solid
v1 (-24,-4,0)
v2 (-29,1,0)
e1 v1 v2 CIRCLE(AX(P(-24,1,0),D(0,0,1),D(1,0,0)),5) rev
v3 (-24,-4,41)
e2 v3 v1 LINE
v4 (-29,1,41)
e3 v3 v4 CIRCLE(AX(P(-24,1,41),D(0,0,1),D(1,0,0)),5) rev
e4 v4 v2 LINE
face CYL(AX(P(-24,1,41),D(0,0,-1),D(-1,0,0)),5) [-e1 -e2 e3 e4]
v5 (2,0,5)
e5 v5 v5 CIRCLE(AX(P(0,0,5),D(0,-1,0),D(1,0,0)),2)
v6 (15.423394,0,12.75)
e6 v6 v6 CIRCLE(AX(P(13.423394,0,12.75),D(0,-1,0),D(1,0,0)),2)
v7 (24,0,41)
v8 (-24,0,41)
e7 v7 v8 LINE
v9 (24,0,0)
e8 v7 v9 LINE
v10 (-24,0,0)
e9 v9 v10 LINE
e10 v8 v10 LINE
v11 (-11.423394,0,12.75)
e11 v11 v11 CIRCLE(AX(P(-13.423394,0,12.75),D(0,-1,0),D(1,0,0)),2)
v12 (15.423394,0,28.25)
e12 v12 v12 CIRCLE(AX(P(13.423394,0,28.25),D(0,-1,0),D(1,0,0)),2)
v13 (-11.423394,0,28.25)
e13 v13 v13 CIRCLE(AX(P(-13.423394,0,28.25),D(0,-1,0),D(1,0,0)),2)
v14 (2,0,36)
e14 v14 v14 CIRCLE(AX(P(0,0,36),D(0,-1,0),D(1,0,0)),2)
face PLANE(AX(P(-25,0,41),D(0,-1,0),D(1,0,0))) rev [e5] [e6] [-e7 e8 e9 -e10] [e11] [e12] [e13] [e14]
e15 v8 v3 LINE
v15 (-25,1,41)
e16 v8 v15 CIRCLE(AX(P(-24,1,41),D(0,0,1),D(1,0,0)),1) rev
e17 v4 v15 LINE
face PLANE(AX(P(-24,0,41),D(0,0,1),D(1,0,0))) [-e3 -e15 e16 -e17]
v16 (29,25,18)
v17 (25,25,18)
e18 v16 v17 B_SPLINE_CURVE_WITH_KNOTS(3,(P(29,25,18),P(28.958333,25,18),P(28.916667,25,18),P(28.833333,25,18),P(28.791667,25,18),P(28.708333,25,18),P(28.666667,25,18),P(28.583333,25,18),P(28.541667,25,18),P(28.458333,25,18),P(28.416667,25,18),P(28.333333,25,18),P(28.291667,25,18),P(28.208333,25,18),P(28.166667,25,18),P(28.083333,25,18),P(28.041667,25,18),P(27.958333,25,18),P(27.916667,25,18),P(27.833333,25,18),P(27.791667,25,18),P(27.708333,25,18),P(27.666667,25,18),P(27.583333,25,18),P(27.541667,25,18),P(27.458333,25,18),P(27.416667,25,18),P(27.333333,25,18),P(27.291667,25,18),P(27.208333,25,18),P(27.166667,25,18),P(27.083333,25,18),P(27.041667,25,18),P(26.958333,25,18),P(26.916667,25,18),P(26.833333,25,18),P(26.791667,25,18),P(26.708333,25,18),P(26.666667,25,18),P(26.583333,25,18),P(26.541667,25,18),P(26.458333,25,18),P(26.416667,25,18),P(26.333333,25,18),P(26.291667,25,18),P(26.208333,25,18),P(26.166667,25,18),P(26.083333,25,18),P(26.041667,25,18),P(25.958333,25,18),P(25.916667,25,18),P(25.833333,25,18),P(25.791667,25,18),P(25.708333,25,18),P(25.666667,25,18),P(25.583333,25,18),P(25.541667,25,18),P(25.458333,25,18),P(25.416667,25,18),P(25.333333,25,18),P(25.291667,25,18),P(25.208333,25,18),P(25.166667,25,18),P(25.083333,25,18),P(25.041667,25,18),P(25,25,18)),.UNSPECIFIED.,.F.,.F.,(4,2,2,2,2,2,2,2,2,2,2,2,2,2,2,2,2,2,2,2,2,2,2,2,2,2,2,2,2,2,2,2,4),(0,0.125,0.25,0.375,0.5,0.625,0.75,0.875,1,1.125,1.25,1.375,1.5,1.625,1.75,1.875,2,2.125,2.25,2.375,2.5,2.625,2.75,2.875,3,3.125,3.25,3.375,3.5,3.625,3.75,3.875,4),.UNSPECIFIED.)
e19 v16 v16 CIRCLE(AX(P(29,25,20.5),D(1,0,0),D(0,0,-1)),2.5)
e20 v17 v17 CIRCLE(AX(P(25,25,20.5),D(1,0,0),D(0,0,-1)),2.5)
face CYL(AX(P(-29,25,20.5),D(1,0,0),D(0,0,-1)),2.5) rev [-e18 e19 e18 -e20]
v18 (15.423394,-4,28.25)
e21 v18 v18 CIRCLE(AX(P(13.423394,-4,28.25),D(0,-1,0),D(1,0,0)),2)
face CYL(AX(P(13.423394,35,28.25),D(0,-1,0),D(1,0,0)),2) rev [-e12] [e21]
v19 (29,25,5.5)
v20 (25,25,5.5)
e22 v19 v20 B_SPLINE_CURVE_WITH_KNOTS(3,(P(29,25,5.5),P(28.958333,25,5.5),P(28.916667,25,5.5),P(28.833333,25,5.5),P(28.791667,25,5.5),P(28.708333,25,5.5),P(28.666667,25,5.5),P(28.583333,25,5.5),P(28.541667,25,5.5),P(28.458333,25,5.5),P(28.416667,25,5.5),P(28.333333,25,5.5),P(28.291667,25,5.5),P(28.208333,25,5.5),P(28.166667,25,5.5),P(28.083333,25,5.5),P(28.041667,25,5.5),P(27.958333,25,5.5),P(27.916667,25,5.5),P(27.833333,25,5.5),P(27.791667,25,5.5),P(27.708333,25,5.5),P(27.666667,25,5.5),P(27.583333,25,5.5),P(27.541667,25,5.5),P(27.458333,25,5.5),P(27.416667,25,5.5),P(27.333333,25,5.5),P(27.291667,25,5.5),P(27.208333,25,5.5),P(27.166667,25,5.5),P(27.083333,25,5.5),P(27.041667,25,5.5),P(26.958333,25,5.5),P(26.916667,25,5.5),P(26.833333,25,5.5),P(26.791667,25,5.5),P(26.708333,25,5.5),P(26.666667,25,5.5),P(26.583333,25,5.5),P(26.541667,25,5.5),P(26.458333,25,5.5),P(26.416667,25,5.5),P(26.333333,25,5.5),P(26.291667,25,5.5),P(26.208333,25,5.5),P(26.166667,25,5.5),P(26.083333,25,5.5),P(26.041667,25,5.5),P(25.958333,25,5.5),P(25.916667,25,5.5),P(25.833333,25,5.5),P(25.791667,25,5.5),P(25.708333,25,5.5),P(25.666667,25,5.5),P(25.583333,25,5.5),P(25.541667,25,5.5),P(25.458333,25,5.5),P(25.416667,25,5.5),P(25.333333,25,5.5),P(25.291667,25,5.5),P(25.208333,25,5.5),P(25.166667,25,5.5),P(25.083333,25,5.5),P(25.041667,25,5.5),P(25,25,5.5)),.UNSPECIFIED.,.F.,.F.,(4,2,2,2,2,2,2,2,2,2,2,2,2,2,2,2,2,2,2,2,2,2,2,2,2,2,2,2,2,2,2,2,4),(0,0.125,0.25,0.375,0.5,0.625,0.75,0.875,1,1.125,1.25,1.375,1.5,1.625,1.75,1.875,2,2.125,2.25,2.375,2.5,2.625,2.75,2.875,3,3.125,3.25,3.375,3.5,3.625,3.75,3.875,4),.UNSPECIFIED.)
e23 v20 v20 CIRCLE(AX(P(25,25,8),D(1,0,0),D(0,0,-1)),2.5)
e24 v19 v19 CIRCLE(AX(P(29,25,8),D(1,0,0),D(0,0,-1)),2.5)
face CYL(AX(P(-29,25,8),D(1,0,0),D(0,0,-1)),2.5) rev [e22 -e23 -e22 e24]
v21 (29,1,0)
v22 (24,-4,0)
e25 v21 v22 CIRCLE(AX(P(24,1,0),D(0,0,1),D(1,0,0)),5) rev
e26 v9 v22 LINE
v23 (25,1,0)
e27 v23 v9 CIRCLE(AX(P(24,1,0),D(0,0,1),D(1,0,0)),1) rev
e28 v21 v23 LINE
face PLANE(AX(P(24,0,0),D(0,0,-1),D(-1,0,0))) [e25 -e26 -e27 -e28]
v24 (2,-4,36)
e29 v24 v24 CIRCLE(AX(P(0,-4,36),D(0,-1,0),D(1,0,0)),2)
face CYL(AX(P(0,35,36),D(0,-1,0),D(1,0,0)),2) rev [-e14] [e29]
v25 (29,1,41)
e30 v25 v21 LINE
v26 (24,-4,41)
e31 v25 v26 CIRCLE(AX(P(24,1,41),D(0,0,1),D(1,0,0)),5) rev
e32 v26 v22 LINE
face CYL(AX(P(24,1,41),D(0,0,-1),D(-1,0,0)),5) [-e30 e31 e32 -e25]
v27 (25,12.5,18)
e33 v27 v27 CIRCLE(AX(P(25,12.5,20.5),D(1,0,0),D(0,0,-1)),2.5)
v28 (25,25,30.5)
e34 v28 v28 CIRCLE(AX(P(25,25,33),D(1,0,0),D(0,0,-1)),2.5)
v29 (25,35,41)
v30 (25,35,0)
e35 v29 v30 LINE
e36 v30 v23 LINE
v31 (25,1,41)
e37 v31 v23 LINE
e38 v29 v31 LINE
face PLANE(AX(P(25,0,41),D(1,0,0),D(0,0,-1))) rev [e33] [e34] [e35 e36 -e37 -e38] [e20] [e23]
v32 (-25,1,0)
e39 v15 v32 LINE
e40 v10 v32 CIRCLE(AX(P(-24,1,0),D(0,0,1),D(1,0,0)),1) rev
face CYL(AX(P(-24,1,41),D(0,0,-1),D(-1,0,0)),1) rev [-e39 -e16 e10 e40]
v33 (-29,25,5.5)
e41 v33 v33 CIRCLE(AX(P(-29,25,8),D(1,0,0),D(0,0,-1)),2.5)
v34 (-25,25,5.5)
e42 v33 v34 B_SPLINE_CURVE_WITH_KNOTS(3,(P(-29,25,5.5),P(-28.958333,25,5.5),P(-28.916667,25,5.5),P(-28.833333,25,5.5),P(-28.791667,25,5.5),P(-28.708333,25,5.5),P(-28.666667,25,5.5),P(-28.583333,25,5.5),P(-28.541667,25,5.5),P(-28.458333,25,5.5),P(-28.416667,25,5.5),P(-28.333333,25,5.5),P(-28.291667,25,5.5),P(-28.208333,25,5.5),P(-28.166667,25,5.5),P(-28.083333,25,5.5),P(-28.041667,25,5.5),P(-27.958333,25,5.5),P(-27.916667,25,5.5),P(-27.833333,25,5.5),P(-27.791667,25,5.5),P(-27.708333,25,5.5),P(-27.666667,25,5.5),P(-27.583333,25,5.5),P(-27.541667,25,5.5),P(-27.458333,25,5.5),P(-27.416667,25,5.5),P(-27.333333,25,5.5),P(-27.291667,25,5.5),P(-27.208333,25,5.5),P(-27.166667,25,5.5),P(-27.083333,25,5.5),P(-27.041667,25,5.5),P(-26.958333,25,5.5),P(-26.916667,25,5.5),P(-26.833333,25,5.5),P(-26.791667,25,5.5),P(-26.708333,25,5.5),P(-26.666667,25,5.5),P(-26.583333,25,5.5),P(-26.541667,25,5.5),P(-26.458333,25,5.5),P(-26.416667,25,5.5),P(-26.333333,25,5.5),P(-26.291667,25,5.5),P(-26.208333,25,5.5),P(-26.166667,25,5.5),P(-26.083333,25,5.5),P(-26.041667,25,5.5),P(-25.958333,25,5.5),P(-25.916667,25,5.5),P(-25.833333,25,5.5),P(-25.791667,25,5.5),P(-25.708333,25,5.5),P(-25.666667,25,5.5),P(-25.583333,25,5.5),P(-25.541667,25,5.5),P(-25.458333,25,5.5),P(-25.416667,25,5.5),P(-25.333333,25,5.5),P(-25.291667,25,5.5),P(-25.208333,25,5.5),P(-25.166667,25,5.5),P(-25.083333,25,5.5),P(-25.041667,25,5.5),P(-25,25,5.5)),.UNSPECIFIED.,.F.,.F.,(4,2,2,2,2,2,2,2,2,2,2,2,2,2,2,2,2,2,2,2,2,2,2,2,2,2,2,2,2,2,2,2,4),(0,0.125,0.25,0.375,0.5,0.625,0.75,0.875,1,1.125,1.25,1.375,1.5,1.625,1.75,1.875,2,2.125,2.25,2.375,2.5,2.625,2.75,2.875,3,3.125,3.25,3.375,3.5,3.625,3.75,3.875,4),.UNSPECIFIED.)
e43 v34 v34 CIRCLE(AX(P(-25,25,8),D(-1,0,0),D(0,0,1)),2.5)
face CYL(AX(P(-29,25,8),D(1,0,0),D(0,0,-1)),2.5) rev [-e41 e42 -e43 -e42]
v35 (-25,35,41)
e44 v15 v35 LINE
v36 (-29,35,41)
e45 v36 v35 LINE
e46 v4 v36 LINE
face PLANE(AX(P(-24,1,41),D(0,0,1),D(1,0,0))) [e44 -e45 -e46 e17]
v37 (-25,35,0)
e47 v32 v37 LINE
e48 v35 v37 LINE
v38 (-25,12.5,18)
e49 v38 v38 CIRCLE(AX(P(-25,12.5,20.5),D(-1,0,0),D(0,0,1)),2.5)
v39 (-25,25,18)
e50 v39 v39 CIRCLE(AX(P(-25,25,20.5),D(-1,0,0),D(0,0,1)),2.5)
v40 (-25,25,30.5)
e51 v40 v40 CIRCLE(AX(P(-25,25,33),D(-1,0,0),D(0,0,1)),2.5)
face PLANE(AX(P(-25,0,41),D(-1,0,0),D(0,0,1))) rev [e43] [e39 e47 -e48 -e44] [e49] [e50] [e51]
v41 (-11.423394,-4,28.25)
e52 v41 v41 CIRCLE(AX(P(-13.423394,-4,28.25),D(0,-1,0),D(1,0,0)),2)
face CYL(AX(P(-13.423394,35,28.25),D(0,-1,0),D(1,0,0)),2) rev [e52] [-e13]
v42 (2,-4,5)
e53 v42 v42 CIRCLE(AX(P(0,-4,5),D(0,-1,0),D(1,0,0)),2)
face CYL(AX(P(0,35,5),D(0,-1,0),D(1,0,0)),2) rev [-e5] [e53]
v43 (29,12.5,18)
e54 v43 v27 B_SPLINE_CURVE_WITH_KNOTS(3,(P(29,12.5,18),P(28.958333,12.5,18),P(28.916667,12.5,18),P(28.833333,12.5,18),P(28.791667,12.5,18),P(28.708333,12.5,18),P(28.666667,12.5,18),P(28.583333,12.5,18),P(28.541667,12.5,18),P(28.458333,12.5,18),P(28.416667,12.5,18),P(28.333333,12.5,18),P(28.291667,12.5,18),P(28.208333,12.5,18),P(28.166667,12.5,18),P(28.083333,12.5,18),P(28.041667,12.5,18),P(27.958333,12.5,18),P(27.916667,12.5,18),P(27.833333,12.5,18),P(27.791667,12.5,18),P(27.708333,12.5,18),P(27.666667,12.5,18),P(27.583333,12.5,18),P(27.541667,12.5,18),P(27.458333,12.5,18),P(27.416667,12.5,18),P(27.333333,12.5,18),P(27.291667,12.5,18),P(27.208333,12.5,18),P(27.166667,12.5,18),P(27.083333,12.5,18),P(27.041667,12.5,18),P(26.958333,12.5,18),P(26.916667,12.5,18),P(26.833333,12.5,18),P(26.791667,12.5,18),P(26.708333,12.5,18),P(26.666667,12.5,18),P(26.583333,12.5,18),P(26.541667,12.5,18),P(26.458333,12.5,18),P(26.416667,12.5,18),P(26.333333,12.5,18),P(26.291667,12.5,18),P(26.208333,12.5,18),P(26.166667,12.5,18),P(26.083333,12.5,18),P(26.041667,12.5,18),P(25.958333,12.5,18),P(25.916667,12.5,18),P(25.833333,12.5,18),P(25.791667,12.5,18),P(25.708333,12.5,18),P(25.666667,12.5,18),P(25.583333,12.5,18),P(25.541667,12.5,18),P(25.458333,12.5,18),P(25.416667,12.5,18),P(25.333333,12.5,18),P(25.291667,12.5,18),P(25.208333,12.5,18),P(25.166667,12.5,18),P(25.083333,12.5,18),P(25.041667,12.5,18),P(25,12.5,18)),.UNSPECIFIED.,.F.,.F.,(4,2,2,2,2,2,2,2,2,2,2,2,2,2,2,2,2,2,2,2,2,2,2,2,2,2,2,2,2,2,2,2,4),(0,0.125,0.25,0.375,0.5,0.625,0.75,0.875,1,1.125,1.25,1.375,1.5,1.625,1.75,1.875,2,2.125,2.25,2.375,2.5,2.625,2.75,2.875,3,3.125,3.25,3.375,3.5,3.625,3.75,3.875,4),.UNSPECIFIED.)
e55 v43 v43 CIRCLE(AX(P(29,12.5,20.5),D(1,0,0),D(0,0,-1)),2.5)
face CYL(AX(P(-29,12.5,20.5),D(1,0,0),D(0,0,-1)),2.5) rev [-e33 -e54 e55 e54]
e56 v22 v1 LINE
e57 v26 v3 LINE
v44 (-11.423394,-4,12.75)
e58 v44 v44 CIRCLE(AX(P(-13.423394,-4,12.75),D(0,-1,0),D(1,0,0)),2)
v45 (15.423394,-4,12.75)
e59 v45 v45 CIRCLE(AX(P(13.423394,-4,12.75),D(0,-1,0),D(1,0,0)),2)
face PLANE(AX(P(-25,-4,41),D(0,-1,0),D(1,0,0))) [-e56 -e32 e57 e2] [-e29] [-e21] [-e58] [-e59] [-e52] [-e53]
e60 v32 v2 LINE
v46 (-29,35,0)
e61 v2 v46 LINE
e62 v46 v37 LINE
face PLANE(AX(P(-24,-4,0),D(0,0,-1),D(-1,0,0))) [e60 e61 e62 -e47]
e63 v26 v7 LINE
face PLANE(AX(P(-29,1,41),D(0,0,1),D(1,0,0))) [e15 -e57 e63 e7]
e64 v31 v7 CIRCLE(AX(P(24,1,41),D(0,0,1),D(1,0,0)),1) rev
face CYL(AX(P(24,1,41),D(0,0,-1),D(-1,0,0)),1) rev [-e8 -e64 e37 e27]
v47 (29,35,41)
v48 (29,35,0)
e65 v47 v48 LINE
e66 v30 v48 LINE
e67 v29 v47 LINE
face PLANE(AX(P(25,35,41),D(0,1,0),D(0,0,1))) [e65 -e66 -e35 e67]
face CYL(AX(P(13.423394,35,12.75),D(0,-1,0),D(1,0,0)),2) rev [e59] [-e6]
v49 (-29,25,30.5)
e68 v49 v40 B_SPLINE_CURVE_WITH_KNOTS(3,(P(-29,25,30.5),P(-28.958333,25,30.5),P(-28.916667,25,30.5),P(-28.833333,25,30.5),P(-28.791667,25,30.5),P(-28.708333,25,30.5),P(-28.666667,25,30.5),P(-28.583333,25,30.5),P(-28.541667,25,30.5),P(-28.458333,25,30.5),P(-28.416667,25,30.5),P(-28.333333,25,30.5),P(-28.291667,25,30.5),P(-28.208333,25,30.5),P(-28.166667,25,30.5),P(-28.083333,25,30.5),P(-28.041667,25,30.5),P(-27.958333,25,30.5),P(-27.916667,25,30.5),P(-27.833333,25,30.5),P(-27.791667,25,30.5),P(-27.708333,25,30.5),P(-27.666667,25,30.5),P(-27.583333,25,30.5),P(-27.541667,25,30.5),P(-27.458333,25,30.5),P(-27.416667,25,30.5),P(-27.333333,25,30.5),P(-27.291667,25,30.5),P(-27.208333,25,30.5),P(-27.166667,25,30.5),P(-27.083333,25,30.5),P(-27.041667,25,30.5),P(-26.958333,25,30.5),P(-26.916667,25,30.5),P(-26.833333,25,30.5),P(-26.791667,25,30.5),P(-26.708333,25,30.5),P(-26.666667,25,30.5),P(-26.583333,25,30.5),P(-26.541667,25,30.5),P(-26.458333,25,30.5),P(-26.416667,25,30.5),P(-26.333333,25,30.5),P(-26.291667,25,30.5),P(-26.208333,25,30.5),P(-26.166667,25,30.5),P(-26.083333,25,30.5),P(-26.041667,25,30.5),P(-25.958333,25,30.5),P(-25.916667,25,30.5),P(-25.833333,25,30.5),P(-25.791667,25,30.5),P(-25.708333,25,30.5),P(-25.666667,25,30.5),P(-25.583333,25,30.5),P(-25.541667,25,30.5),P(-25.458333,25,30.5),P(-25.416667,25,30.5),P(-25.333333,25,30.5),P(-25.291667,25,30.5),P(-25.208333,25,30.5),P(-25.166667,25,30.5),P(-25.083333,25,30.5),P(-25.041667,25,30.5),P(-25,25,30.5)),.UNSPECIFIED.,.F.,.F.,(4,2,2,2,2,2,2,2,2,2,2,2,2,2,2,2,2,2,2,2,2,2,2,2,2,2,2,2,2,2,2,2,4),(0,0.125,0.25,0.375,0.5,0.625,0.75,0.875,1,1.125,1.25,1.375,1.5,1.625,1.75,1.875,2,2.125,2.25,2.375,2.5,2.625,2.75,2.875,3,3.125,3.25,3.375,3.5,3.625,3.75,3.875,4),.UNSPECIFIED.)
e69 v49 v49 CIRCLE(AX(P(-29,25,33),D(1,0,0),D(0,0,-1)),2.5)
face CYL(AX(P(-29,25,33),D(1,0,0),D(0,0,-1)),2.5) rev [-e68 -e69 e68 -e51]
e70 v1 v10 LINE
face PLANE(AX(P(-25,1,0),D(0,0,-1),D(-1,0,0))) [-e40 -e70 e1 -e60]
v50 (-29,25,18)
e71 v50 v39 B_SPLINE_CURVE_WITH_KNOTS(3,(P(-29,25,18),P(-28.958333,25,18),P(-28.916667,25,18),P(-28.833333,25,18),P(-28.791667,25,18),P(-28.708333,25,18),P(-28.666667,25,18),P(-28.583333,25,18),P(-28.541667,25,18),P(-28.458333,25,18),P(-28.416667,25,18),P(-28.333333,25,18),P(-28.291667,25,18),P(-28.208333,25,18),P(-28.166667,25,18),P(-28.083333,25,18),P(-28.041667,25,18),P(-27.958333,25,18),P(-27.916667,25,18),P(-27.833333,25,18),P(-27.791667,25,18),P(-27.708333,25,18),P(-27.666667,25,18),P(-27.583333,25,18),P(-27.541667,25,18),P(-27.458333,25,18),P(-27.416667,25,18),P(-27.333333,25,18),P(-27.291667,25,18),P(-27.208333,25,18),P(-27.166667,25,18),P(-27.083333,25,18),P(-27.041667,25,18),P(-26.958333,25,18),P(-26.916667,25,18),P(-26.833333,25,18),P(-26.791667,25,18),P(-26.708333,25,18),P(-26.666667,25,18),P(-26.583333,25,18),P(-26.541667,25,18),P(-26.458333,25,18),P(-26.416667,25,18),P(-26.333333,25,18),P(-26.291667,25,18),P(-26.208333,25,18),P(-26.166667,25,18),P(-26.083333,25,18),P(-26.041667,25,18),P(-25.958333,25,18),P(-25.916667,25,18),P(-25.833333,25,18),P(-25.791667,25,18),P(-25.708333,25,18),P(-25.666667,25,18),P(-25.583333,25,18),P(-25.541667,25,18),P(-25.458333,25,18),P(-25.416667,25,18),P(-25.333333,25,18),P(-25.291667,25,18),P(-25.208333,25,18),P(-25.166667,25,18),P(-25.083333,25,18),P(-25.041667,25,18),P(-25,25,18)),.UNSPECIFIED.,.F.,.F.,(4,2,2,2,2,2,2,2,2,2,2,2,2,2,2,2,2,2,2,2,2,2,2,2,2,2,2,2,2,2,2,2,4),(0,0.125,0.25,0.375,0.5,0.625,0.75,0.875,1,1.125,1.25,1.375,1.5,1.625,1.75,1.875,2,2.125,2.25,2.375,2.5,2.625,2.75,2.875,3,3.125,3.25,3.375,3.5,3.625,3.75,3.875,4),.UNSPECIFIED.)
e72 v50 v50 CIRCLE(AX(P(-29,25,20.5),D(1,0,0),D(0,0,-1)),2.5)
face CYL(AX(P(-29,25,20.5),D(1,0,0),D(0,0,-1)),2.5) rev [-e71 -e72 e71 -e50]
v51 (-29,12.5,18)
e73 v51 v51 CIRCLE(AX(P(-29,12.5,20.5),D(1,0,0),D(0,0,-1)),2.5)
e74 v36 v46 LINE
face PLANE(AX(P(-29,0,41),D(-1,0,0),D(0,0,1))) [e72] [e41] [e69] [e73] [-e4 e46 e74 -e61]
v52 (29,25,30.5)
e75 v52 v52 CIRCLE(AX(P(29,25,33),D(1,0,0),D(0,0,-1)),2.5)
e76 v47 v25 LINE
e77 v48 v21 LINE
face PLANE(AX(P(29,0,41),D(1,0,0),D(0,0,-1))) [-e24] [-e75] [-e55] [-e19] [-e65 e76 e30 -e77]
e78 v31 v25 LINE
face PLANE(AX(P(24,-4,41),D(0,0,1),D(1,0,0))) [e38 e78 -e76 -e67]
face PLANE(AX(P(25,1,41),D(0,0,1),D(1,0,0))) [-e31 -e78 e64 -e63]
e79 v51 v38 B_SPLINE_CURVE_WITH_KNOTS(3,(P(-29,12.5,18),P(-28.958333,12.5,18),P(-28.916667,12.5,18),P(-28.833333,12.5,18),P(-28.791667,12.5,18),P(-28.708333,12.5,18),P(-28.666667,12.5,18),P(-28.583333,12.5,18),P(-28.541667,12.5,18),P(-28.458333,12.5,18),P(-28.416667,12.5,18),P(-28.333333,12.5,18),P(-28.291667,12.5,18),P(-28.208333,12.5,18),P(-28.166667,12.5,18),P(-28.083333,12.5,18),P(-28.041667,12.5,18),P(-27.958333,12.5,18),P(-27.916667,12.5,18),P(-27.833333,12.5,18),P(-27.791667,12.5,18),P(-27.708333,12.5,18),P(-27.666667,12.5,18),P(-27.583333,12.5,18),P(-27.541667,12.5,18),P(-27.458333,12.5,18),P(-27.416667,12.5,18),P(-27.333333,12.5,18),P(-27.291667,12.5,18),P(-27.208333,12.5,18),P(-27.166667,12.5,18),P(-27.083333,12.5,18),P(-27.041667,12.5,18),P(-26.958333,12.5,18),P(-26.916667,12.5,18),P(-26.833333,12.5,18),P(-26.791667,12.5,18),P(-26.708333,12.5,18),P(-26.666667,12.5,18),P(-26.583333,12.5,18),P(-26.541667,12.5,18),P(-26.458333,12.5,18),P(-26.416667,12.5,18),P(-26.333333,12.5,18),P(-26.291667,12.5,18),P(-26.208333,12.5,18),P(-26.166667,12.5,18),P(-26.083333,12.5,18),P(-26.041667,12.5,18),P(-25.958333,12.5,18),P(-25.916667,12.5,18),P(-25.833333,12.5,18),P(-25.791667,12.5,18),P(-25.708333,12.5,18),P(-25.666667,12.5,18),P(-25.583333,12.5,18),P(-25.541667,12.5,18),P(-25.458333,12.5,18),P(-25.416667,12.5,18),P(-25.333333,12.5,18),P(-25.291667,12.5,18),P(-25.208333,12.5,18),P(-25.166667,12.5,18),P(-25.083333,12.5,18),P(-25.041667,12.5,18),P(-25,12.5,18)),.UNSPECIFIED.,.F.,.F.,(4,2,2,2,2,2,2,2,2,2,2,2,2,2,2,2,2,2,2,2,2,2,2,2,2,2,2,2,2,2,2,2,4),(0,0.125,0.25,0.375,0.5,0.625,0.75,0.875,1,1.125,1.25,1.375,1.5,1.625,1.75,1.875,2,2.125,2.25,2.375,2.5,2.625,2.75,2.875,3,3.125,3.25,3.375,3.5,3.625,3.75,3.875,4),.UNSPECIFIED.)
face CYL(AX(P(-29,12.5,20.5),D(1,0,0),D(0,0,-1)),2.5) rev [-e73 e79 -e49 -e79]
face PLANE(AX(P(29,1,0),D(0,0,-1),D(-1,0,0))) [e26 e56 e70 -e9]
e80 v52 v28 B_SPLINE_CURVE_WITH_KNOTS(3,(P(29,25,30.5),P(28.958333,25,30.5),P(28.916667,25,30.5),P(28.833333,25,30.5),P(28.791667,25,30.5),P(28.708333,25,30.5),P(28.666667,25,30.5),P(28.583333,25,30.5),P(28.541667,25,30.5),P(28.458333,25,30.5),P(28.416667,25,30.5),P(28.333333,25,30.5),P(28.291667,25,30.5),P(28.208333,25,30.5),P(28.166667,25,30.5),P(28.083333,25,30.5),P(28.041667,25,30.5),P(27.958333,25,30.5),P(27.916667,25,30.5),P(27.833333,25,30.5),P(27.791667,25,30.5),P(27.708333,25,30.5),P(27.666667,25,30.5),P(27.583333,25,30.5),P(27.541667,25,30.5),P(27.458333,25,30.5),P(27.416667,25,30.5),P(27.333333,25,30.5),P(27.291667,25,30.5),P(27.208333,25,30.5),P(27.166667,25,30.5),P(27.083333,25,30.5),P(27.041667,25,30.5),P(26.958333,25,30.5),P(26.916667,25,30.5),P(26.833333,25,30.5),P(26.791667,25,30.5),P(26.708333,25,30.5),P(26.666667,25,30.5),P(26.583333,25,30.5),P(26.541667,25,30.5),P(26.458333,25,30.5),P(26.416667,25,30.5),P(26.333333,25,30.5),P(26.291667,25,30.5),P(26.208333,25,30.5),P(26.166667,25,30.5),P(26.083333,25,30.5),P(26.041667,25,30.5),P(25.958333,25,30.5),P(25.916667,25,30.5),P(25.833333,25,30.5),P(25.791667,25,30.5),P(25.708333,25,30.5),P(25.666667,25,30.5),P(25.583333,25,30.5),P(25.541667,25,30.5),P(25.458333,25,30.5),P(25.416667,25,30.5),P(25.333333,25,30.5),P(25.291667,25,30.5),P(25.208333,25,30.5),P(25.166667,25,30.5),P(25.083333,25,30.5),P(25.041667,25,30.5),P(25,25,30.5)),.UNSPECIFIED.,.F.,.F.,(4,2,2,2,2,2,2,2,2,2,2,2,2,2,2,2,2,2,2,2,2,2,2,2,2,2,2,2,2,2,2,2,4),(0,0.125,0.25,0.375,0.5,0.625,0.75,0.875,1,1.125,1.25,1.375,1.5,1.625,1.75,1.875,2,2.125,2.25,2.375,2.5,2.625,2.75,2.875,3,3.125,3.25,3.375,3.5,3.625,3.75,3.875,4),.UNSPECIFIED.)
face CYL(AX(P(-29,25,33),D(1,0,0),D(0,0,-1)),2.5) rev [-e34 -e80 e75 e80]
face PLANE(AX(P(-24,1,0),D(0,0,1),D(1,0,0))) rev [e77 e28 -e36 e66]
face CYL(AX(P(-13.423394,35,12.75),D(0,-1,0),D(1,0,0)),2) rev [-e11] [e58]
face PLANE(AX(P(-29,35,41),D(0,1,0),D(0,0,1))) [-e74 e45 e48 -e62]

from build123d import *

# Parameters (mm, degrees)
SM_BASE_FLANGE_1_DEPTH   = 41
SKETCH_9_R               = 2
CUT_EXTRUDE_4_DEPTH      = 64.584589328
CUT_EXTRUDE_5_DEPTH      = 80.183331579
CUT_EXTRUDE_5_DEPTH_BACK = 80.183331579
SKETCH_10_R              = 2.5


# Sheet-metal steps are written as plain solids
with BuildPart() as part:
    # Sketch 1 → Базовая кромка1 (new body)
    with BuildSketch(Plane.XY):
        with BuildLine():
            Line((-25, 35), (-25, 1))
            ThreePointArc((-25, 1), (-24.707106781, 0.292893219), (-24, 0))
            Line((-24, 0), (24, 0))
            ThreePointArc((24, 0), (24.707106781, 0.292893219), (25, 1))
            Line((25, 1), (25, 35))
            Line((25, 35), (29, 35))
            Line((29, 35), (29, 1))
            ThreePointArc((29, 1), (27.535533906, -2.535533906), (24, -4))
            Line((24, -4), (-24, -4))
            ThreePointArc((-24, -4), (-27.535533906, -2.535533906), (-29, 1))
            Line((-29, 1), (-29, 35))
            Line((-29, 35), (-25, 35))
        make_face()
    extrude(amount=SM_BASE_FLANGE_1_DEPTH)

    # Эскиз9 → Вырез-Вытянуть4 (cut, through all)
    with BuildSketch(Plane.XZ.offset(4)):
        with Locations((0, 5)):
            Circle(SKETCH_9_R)
        with Locations((-13.423393759, 12.75)):
            Circle(SKETCH_9_R)
        with Locations((-13.423393759, 28.25)):
            Circle(SKETCH_9_R)
        with Locations((0, 36)):
            Circle(SKETCH_9_R)
        with Locations((13.423393759, 28.25)):
            Circle(SKETCH_9_R)
        with Locations((13.423393759, 12.75)):
            Circle(SKETCH_9_R)
    extrude(amount=-CUT_EXTRUDE_4_DEPTH, mode=Mode.SUBTRACT)

    # Эскиз10 → Вырез-Вытянуть5 (cut, two sides: drawn at the far end of the back side and taken through both)
    with BuildSketch(Plane(origin=(29, 0, 0), x_dir=(0, 0, -1), z_dir=(1, 0, 0)).offset(-CUT_EXTRUDE_5_DEPTH_BACK)):
        with Locations((-33, 25)):
            Circle(SKETCH_10_R)
        with Locations((-20.5, 25)):
            Circle(SKETCH_10_R)
        with Locations((-8, 25)):
            Circle(SKETCH_10_R)
        with Locations((-20.5, 12.5)):
            Circle(SKETCH_10_R)
    extrude(amount=CUT_EXTRUDE_5_DEPTH + CUT_EXTRUDE_5_DEPTH_BACK, mode=Mode.SUBTRACT)


solid = part.part
